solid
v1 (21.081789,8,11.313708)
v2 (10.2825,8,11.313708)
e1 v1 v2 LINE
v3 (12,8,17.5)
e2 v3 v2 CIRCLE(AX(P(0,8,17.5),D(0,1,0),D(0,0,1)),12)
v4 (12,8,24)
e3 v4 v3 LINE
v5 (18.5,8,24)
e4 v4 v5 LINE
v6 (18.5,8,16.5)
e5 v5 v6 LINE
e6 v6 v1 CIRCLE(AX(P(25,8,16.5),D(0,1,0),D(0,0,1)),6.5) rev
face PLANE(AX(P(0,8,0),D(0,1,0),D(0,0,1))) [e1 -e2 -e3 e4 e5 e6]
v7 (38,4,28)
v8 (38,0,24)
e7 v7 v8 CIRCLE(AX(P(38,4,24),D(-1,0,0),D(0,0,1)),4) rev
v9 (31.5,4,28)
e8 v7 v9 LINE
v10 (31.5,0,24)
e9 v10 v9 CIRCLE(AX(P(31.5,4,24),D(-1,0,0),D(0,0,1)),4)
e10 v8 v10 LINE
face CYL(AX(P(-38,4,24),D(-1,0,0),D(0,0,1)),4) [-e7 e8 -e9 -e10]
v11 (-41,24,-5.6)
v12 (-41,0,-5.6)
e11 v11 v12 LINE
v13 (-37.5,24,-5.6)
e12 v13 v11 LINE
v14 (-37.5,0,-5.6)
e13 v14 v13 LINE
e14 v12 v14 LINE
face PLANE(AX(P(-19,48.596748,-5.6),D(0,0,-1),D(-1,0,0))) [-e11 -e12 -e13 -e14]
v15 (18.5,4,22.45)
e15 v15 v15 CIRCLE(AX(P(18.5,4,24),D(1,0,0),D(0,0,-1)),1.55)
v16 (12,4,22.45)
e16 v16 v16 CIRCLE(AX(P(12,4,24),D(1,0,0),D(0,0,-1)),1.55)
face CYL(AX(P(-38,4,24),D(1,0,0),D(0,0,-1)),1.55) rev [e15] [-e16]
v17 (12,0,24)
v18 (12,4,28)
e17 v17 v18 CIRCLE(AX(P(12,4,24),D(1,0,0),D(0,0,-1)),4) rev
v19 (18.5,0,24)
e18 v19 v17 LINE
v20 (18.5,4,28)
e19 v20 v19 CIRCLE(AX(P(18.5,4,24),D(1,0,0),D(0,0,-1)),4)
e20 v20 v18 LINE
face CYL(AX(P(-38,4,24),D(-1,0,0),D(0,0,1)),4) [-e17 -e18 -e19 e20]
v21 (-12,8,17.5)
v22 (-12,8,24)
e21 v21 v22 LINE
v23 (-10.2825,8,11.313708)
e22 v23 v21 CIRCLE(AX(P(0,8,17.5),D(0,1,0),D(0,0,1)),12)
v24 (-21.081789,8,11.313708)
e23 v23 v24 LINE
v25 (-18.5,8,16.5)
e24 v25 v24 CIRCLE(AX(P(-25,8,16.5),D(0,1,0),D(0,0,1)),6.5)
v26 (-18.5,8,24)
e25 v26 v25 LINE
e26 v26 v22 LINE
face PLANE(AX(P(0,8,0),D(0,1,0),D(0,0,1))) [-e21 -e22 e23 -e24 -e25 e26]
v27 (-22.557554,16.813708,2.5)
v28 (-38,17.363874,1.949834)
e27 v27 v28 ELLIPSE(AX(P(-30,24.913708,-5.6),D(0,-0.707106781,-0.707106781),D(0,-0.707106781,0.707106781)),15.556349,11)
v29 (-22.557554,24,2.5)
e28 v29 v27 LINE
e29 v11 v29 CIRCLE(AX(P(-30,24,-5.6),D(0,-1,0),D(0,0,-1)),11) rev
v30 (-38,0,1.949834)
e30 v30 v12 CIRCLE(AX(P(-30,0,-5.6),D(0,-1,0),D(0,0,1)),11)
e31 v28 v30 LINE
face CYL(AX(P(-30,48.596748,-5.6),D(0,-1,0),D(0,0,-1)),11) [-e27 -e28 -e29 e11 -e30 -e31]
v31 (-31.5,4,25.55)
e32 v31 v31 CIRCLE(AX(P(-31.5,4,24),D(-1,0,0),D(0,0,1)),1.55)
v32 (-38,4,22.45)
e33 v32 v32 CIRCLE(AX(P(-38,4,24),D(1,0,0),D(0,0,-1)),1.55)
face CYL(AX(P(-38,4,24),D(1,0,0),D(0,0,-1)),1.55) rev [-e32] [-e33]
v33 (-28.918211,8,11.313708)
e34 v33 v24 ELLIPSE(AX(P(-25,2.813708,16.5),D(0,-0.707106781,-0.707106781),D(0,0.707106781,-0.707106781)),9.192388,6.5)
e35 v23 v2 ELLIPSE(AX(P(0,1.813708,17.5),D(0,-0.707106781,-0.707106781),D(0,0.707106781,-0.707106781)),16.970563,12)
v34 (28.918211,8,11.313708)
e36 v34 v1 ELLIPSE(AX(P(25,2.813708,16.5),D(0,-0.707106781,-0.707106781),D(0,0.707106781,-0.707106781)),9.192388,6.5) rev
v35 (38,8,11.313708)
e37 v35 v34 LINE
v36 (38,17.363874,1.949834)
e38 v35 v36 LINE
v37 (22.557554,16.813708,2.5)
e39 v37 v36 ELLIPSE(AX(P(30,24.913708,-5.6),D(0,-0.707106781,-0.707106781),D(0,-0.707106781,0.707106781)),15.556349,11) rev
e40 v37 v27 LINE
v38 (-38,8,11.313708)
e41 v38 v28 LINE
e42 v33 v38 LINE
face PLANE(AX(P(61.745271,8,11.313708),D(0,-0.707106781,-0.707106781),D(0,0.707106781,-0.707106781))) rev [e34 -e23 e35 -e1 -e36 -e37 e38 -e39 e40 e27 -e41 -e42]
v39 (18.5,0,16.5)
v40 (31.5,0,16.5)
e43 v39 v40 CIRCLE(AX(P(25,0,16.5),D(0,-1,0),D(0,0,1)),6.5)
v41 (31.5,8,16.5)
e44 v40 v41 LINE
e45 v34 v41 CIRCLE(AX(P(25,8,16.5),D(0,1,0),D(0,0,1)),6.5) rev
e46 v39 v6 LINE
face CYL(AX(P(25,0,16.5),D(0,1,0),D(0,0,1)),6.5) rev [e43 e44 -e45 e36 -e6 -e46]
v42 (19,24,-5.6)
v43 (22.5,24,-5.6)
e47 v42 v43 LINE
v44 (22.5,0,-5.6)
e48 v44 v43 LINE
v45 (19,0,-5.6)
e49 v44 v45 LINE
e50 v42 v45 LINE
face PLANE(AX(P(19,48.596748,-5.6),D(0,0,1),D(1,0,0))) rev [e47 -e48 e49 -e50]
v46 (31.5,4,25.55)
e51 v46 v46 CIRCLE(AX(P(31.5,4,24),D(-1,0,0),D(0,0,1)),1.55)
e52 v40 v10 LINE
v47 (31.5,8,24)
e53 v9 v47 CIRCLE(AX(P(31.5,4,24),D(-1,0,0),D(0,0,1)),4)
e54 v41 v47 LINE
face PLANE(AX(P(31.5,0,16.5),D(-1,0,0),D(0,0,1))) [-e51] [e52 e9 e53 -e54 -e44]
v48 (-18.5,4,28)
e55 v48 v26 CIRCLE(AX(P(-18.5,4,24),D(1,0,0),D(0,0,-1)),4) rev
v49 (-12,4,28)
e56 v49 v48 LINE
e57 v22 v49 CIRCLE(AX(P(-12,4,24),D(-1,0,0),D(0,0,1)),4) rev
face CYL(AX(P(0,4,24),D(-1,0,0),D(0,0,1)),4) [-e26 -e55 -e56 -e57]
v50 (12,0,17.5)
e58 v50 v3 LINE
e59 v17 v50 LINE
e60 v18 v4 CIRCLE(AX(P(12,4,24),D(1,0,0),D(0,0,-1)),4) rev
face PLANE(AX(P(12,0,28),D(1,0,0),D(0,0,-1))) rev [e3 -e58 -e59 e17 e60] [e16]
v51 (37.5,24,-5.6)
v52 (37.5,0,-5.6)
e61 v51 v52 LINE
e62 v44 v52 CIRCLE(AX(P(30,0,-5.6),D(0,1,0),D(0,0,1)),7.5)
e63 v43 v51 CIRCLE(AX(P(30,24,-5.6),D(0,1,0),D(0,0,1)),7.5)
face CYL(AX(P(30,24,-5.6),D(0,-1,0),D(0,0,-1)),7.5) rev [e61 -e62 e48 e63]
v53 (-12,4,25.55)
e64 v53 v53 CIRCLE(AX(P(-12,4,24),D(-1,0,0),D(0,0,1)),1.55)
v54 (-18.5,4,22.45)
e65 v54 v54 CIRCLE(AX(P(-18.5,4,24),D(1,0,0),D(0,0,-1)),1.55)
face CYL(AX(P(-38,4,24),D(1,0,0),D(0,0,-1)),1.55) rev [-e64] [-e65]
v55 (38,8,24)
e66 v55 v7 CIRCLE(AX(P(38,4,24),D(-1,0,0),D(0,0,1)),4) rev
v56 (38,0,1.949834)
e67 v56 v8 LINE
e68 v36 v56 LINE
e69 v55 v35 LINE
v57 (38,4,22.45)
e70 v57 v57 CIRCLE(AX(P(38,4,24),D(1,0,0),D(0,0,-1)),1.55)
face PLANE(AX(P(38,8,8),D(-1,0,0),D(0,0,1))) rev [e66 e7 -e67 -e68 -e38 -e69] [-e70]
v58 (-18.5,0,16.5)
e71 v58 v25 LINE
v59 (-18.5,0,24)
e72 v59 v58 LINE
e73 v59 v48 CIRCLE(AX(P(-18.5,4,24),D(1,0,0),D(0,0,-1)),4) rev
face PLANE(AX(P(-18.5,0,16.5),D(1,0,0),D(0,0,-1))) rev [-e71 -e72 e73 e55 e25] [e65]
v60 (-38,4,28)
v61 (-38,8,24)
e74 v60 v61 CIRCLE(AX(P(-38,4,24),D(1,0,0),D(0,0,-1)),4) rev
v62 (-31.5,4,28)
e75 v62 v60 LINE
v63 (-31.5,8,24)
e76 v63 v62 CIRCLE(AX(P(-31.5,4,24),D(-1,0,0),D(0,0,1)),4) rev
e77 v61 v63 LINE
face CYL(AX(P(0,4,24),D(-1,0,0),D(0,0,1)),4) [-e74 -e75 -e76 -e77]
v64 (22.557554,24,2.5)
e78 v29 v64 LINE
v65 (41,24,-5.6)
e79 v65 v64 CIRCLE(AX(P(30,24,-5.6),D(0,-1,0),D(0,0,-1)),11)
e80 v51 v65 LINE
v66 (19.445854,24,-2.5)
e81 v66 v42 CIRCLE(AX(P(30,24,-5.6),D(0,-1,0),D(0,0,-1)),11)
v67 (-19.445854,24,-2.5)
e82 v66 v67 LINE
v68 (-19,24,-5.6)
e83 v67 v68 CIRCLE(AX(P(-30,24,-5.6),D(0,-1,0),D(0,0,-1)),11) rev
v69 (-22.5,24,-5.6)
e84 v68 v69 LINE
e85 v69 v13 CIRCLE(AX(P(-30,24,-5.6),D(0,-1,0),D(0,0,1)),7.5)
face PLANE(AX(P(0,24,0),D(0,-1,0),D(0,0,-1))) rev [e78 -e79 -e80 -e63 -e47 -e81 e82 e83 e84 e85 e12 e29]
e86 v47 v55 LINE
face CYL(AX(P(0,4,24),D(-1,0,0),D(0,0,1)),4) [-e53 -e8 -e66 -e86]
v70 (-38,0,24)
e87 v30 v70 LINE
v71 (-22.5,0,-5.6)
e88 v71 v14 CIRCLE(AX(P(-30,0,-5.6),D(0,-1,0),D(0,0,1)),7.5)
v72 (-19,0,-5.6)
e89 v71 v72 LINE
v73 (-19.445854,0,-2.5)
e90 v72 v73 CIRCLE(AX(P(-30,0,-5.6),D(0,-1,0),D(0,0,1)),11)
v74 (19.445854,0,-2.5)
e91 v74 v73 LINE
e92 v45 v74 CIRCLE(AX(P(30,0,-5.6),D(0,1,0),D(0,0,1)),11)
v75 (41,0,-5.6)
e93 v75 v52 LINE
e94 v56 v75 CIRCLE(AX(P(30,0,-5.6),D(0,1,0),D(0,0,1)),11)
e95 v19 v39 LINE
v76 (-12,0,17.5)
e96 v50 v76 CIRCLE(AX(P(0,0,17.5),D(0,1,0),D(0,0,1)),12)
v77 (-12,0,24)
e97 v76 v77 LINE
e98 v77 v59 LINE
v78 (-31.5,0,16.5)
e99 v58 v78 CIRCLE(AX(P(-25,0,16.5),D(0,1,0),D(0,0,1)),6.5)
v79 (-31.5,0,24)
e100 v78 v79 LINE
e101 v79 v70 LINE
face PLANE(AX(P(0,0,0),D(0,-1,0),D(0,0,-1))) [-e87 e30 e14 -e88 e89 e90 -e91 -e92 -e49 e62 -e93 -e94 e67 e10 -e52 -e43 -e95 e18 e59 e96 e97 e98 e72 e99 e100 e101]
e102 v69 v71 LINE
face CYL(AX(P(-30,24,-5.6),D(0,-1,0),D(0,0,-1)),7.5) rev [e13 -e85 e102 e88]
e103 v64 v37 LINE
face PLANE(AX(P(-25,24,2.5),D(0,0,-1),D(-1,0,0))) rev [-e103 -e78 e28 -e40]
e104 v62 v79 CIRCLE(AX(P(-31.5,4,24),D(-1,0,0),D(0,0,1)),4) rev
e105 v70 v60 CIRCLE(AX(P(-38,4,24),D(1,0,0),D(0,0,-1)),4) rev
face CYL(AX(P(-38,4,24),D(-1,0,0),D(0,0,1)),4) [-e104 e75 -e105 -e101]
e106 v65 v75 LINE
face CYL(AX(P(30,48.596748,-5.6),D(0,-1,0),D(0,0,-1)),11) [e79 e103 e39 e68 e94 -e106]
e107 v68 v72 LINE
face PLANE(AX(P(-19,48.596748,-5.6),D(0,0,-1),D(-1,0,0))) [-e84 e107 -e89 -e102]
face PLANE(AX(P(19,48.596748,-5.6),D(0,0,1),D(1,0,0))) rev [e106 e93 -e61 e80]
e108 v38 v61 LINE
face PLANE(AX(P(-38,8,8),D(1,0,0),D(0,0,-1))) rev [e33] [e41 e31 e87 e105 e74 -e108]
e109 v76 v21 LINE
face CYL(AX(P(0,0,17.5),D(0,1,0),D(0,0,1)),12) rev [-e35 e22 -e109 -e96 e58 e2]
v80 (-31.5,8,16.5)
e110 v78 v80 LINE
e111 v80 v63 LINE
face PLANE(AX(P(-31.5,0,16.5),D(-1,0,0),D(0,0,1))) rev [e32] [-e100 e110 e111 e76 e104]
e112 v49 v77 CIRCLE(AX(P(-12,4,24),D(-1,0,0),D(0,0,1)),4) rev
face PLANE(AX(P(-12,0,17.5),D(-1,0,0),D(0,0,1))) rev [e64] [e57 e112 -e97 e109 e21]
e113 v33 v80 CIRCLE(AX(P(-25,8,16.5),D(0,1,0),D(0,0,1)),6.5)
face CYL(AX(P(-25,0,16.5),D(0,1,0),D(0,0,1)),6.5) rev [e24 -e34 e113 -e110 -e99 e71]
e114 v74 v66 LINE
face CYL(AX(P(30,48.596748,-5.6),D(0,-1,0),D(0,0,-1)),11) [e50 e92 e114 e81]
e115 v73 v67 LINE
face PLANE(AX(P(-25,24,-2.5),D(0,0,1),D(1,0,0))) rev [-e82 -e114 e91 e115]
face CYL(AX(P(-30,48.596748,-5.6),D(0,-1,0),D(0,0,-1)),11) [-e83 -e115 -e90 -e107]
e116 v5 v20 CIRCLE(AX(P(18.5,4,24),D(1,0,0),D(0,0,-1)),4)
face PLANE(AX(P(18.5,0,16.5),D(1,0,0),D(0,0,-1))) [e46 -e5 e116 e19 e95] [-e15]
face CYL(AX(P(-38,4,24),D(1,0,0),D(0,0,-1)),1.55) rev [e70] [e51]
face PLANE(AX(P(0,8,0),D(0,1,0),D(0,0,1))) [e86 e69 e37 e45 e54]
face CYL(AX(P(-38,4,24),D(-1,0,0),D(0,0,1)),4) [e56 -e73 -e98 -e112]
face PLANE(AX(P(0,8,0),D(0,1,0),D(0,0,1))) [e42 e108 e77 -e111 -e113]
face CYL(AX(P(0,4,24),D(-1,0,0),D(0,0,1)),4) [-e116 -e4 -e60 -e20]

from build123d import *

# Parameters (mm, degrees)
SKETCH1_W                       = 50
SKETCH1_H                       = 5
BOSS_EXTRUDE1_DEPTH             = 24
SKETCH5_W                       = 76
SKETCH5_H                       = 20
BOSS_EXTRUDE3_DEPTH             = 8
BOSS_EXTRUDE4_REACH             = 54.953
BOSS_EXTRUDE4_DIRECTION_2_REACH = 54.953
CUT_EXTRUDE4_DEPTH              = 50.839743178
FILLET1_R                       = 4
SKETCH8_R                       = 1.55
CUT_EXTRUDE5_DEPTH              = 85.474848328
BOSS_EXTRUDE2_REACH             = 54.953
SKETCH4_R                       = 7.5
CUT_EXTRUDE3_DEPTH              = 56.145262716


with BuildPart() as part:
    # Sketch1 → Boss-Extrude1 (new body)
    with BuildSketch(Plane(origin=(0, 0, 0), x_dir=(1, 0, 0), z_dir=(0, 1, 0))):
        Rectangle(SKETCH1_W, SKETCH1_H)
    extrude(amount=BOSS_EXTRUDE1_DEPTH)


with BuildPart() as body_2:
    # Sketch5 → Boss-Extrude3 (new body)
    with BuildSketch(Plane(origin=(0, 0, 0), x_dir=(1, 0, 0), z_dir=(0, 1, 0))):
        with Locations((0, -18)):
            Rectangle(SKETCH5_W, SKETCH5_H)
    extrude(amount=BOSS_EXTRUDE3_DEPTH)

    # Boss-Extrude4: up to this face of the body (flat: up to its plane)
    boss_extrude4_end = Plane(body_2.part.faces().sort_by_distance((38, 4, 18))[0])
    # Sketch6 → Boss-Extrude4 (add, up to the picked face)
    with BuildSketch(Plane(origin=(0, 0, 0), x_dir=(0, 0, -1), z_dir=(1, 0, 0)), mode=Mode.PRIVATE) as boss_extrude4_sk1:
        Polygon((-11.313708499, 8), (0, 19.313708499), (2.5, 19.313708499), (2.5, 0), (-11.313708499, 0), align=None)
    boss_extrude4_tool1 = split(extrude(boss_extrude4_sk1.sketch, amount=BOSS_EXTRUDE4_REACH, mode=Mode.PRIVATE), bisect_by=boss_extrude4_end, keep=Keep.BOTH, mode=Mode.PRIVATE)

    add(part.part)  # Boss-Extrude4 merges part
    add(boss_extrude4_tool1.solids().sort_by(Axis((0, 7.799404, 3.417281), (1, 0, 0)))[0])

    # Boss-Extrude4 direction 2: up to this face of the body (flat: up to its plane)
    boss_extrude4_direction_2_end = Plane(body_2.part.faces().sort_by_distance((-38, 4, 18))[0])
    # Sketch6 → Boss-Extrude4 direction 2 (add, up to the picked face)
    with BuildSketch(Plane(origin=(0, 0, 0), x_dir=(0, 0, -1), z_dir=(1, 0, 0)), mode=Mode.PRIVATE) as boss_extrude4_direction_2_sk1:
        Polygon((-11.313708499, 8), (0, 19.313708499), (2.5, 19.313708499), (2.5, 0), (-11.313708499, 0), align=None)
    boss_extrude4_direction_2_tool1 = split(extrude(boss_extrude4_direction_2_sk1.sketch, amount=-BOSS_EXTRUDE4_DIRECTION_2_REACH, mode=Mode.PRIVATE), bisect_by=boss_extrude4_direction_2_end, keep=Keep.BOTH, mode=Mode.PRIVATE)
    add(boss_extrude4_direction_2_tool1.solids().sort_by(Axis((0, 7.799404, 3.417281), (-1, 0, 0)))[0])

    # Sketch7 → Cut-Extrude4 (cut, symmetric)
    with BuildSketch(Plane(origin=(0, 8, 0), x_dir=(1, 0, 0), z_dir=(0, 1, 0))):
        with BuildLine():
            Line((-12, -17.5), (-12, -28))
            Line((-12, -28), (12, -28))
            Line((12, -28), (12, -17.5))
            ThreePointArc((12, -17.5), (0, -5.5), (-12, -17.5))
        make_face()
        with BuildLine():
            Line((-31.5, -16.5), (-31.5, -28))
            Line((-31.5, -28), (-18.5, -28))
            Line((-18.5, -28), (-18.5, -16.5))
            ThreePointArc((-18.5, -16.5), (-25, -10), (-31.5, -16.5))
        make_face()
    cut_extrude4 = extrude(amount=CUT_EXTRUDE4_DEPTH, both=True, mode=Mode.SUBTRACT)

    # Mirror2: Cut-Extrude4 across plane
    add(cut_extrude4.mirror(Plane(origin=(0, 0, 0), x_dir=(0, 0, 1), z_dir=(1, 0, 0))), mode=Mode.SUBTRACT)

    # Fillet1
    fillet1_edges = [body_2.edges().sort_by_distance(p)[0] for p in [
        (-34.75, 0, 28),
        (-34.75, 8, 28),
        (34.75, 0, 28),
        (34.75, 8, 28),
        (15.25, 8, 28),
        (15.25, 0, 28),
        (-15.25, 0, 28),
        (-15.25, 8, 28),
    ]]
    fillet(fillet1_edges, radius=FILLET1_R - 0.0001)  # a hair under: the kernel refuses the full size

    # Sketch8 → Cut-Extrude5 (cut, through all)
    with BuildSketch(Plane(origin=(38, 0, 0), x_dir=(0, 0, -1), z_dir=(1, 0, 0))):
        with Locations((-24, 4)):
            Circle(SKETCH8_R)
    extrude(amount=-CUT_EXTRUDE5_DEPTH, mode=Mode.SUBTRACT)

    # Boss-Extrude2: up to this face of the body (flat: up to its plane)
    boss_extrude2_end = Plane(body_2.part.faces().sort_by_distance((0, 24, 0))[0])
    # Sketch2 → Boss-Extrude2 (add, up to the picked face)
    with BuildSketch(Plane(origin=(0, 0, 0), x_dir=(1, 0, 0), z_dir=(0, 1, 0)), mode=Mode.PRIVATE) as boss_extrude2_sk1:
        with BuildLine():
            Line((19, 5.6), (41, 5.6))
            ThreePointArc((41, 5.6), (30, -5.4), (19, 5.6))
        make_face()
    boss_extrude2_tool1 = split(extrude(boss_extrude2_sk1.sketch, amount=BOSS_EXTRUDE2_REACH, mode=Mode.PRIVATE), bisect_by=boss_extrude2_end, keep=Keep.BOTH, mode=Mode.PRIVATE)
    boss_extrude2 = boss_extrude2_tool1.solids().sort_by(Axis((30, 0, -0.931455), (0, 1, 0)))[0]
    add(boss_extrude2)

    # Sketch4 → Cut-Extrude3 (cut, through all)
    with BuildSketch(Plane(origin=(0, 0, 0), x_dir=(1, 0, 0), z_dir=(0, 1, 0))):
        with Locations((30, 5.6)):
            Circle(SKETCH4_R)
    cut_extrude3 = extrude(amount=CUT_EXTRUDE3_DEPTH, mode=Mode.SUBTRACT)

    # Mirror1: Boss-Extrude2, Cut-Extrude3 across plane
    add(boss_extrude2.mirror(Plane(origin=(0, 0, 0), x_dir=(0, 0, 1), z_dir=(1, 0, 0))))
    add(cut_extrude3.mirror(Plane(origin=(0, 0, 0), x_dir=(0, 0, 1), z_dir=(1, 0, 0))), mode=Mode.SUBTRACT)


solid = body_2.part
